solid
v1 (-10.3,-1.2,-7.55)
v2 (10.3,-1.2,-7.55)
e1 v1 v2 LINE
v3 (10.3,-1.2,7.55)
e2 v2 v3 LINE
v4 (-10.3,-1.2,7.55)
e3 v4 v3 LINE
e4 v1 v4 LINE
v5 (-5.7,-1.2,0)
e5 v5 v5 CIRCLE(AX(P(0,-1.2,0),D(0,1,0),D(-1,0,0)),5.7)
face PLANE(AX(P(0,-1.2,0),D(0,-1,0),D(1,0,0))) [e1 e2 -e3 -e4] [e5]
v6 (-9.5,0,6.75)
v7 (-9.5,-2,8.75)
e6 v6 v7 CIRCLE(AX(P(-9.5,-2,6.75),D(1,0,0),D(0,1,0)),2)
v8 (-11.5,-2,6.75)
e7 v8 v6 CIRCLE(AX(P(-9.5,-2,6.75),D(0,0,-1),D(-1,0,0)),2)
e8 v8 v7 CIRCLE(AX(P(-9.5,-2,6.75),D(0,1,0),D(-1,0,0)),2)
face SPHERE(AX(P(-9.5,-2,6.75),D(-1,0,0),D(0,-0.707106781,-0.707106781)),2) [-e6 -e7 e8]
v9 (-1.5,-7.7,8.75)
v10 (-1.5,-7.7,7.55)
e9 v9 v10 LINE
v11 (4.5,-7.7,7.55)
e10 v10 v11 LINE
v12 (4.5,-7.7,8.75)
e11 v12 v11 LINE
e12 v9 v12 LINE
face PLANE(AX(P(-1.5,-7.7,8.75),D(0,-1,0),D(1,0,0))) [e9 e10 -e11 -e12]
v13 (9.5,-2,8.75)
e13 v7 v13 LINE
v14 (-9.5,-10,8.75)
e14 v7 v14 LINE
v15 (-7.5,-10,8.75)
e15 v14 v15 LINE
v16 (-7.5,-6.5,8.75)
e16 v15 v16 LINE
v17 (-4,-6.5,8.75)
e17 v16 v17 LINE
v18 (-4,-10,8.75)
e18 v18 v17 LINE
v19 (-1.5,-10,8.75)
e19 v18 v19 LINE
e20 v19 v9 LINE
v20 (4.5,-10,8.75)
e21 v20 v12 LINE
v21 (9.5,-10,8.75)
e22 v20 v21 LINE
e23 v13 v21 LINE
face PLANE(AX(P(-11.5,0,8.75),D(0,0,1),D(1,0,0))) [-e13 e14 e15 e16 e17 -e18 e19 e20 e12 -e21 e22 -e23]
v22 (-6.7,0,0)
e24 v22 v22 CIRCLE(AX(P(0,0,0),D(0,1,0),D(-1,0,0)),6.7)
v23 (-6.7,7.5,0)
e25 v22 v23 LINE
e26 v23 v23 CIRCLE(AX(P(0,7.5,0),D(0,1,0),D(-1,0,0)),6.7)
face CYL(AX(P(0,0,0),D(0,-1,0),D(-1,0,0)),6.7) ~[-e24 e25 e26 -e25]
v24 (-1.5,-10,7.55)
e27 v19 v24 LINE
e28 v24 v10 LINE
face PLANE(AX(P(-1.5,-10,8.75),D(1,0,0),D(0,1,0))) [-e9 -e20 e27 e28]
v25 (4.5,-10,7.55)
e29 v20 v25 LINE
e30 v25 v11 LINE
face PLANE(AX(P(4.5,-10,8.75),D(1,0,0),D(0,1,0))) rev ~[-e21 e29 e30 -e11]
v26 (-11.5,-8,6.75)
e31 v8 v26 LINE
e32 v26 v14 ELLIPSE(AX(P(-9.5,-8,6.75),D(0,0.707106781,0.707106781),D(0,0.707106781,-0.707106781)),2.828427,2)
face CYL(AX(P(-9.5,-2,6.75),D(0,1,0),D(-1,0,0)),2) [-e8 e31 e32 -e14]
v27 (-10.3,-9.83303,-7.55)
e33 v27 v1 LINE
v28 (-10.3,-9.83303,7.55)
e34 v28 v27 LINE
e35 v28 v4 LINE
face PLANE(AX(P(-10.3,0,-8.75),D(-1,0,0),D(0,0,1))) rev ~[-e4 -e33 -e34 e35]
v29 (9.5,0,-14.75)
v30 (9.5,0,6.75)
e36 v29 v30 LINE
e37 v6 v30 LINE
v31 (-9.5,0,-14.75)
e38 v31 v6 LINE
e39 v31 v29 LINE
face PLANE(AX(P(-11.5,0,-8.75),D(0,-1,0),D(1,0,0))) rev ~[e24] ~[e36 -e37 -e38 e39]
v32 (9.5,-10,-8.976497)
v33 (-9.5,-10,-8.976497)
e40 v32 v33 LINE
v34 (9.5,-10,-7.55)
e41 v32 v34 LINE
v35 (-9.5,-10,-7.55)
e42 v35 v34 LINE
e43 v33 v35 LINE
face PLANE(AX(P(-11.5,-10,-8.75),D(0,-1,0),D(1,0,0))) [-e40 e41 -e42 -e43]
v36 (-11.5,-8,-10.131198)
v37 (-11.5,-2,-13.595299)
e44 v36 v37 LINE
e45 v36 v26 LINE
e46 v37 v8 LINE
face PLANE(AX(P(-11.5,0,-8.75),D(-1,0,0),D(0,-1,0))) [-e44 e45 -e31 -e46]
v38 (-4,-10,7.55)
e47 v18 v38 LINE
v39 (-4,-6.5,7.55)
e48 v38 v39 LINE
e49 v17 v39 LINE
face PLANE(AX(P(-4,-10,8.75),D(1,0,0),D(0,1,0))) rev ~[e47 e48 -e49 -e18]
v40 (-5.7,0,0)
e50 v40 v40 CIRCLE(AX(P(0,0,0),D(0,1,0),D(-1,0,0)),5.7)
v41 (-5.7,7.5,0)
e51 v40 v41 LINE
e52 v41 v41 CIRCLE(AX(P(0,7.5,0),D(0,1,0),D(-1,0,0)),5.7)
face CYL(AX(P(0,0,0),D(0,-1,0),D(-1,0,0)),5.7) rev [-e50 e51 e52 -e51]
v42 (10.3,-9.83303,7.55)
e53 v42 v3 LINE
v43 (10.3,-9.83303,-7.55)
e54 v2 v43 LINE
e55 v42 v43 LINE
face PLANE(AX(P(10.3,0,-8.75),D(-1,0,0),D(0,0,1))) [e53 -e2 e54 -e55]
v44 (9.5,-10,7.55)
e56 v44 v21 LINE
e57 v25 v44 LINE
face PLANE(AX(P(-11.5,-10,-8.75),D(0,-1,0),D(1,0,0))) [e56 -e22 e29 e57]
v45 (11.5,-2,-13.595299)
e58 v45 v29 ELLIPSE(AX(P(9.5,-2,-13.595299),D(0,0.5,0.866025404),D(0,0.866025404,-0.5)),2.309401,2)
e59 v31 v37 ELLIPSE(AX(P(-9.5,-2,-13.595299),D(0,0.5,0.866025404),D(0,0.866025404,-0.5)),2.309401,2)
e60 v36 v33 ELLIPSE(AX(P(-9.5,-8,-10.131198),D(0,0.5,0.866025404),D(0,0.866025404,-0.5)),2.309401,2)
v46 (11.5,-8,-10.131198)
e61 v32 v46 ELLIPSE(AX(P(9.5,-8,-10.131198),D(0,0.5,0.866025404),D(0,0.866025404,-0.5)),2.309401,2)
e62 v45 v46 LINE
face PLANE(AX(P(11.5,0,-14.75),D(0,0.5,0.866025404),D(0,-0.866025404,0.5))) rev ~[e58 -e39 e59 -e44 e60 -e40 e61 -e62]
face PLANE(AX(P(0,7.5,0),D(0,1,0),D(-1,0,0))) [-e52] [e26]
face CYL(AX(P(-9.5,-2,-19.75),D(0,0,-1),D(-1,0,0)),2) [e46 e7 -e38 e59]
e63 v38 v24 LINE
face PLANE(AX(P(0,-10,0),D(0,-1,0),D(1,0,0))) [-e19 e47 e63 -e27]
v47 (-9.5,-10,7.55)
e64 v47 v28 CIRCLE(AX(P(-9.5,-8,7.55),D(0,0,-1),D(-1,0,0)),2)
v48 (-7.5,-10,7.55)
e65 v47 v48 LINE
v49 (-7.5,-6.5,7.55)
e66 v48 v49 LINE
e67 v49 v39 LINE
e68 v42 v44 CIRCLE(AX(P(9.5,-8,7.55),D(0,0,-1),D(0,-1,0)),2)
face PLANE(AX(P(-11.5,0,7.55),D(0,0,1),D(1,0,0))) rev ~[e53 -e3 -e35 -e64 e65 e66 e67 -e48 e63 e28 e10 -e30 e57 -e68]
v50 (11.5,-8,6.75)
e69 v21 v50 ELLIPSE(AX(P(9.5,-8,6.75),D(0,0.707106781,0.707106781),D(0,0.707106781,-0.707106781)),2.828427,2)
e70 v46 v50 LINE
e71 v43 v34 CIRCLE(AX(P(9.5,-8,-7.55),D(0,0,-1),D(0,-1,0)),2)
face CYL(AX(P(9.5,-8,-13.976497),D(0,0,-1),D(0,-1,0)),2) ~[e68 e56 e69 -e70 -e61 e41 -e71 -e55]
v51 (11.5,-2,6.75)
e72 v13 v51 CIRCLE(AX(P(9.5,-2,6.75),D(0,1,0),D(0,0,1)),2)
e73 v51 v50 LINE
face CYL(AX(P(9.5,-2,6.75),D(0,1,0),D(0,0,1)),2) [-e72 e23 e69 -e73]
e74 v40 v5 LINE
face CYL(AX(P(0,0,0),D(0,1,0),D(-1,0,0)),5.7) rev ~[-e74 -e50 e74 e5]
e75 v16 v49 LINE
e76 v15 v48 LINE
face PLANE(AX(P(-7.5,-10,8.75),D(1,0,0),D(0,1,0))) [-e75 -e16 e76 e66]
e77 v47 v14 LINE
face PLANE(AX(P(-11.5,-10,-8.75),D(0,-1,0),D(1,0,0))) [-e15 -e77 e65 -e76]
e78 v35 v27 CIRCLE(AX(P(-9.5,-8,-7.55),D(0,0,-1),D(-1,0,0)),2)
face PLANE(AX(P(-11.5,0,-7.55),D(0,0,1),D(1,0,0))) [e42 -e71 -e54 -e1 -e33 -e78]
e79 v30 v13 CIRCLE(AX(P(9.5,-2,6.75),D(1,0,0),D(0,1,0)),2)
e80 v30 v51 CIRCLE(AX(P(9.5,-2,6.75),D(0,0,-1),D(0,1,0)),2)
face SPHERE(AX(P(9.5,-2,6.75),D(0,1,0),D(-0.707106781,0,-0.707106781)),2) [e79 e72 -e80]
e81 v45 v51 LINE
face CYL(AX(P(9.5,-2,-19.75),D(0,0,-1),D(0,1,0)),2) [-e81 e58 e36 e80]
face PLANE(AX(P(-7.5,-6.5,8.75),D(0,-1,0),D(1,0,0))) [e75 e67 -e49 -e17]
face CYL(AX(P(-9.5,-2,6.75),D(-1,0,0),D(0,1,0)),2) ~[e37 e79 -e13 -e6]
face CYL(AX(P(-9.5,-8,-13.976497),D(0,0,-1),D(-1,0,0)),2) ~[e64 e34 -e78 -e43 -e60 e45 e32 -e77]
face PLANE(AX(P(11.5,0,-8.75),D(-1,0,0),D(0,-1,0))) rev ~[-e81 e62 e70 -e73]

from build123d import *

# Parameters (mm, degrees)
F0_W          = 23
F0_H          = 17.5
F1_DEPTH      = 10
F2_T          = -1.2
F3_R          = 5.7
F4_DEPTH      = 3
F3_R_2        = 6.7
F5_DEPTH      = 7.5
F6_W          = 6
F6_H          = 2.3
F6_W_2        = 3.5
F6_H_2        = 3.5
F7_DEPTH      = 4
F8_DEPTH      = 6
F10_DEPTH     = 30
F11_T1_DEPTH  = 19
F11_T3_DEPTH  = 26.5
F11_T5_DEPTH  = 13
F11_T7_DEPTH  = 27.7264973081
F11_S11_W     = 2
F11_S11_H     = 2
F11_T12_DEPTH = 2
F11_S17_W     = 2
F11_S17_H     = 2
F11_T18_DEPTH = 2


# Not quite as in the source:
# - a fillet or chamfer that OpenCascade refuses, or shapes differently, is made with other operations: its cross-section is extruded or revolved along the edge and cut away or added


with BuildPart() as f1:
    # F0 (on Front) → F1 (new body)
    with BuildSketch(Plane.XZ):
        Rectangle(F0_W, F0_H)
    extrude(amount=F1_DEPTH)

    # F2
    f2_openings = [f1.faces().sort_by_distance(p)[0] for p in [
        (0, -10, 0),
    ]]
    offset(amount=F2_T, openings=f2_openings)

    # F3 (on face) → F4 (cut)
    with BuildSketch(Plane(origin=(0, 0, 0), x_dir=(-1, 0, 0), z_dir=(0, 1, 0))):
        Circle(F3_R)
    extrude(amount=-F4_DEPTH, mode=Mode.SUBTRACT)

    # F3 (on face) → F5 (join)
    with BuildSketch(Plane(origin=(0, 0, 0), x_dir=(-1, 0, 0), z_dir=(0, 1, 0))):
        Circle(F3_R_2)
        Circle(F3_R, mode=Mode.SUBTRACT)
    extrude(amount=F5_DEPTH)

    # F6 (on face) → F7 (cut)
    with BuildSketch(Plane.XY.offset(8.75)):
        with Locations((1.5, -8.85)):
            Rectangle(F6_W, F6_H)
        with Locations((-5.75, -8.25)):
            Rectangle(F6_W_2, F6_H_2)
    extrude(amount=-F7_DEPTH, mode=Mode.SUBTRACT)

    # F8 (add): a face of the model
    f8_faces = [f1.faces().sort_by_distance(p)[0] for p in [
        (0, -5, -8.75),
    ]]
    extrude(f8_faces, amount=F8_DEPTH)

    # F9 (on face) → F10 (cut)
    with BuildSketch(Plane.YZ.offset(11.5)):
        Polygon((-10, -14.75), (0, -14.75), (-10, -8.9764973081), align=None)
    extrude(amount=-F10_DEPTH, mode=Mode.SUBTRACT)

    # F11: fillet of radius 2 on 7 edges, made by hand

    # F11_s2 → F11_t1 (cut)
    with BuildSketch(Plane.YZ.offset(-9.5)):
        with BuildLine():
            ThreePointArc((0, 6.75), (-0.5857864376, 8.1642135624), (-2, 8.75))
            Line((-2, 8.75), (0, 8.75))
            Line((0, 8.75), (0, 6.75))
        make_face()
    extrude(amount=F11_T1_DEPTH, mode=Mode.SUBTRACT)

    # F11_s4 → F11_t3 (cut)
    with BuildSketch(Plane.XY.offset(-19.75)):
        with BuildLine():
            ThreePointArc((-11.5, -2), (-10.9142135624, -0.5857864376), (-9.5, 0))
            Line((-9.5, 0), (-11.5, 0))
            Line((-11.5, 0), (-11.5, -2))
        make_face()
        with BuildLine():
            ThreePointArc((9.5, 0), (10.9142135624, -0.5857864376), (11.5, -2))
            Line((11.5, -2), (11.5, 0))
            Line((11.5, 0), (9.5, 0))
        make_face()
    extrude(amount=F11_T3_DEPTH, mode=Mode.SUBTRACT)

    # F11_s6 → F11_t5 (cut)
    with BuildSketch(Plane.XZ.offset(2)):
        with BuildLine():
            ThreePointArc((9.5, 8.75), (10.9142135624, 8.1642135624), (11.5, 6.75))
            Line((11.5, 6.75), (11.5, 8.75))
            Line((11.5, 8.75), (9.5, 8.75))
        make_face()
        with BuildLine():
            ThreePointArc((-11.5, 6.75), (-10.9142135624, 8.1642135624), (-9.5, 8.75))
            Line((-9.5, 8.75), (-11.5, 8.75))
            Line((-11.5, 8.75), (-11.5, 6.75))
        make_face()
    extrude(amount=F11_T5_DEPTH, mode=Mode.SUBTRACT)

    # F11_s8 → F11_t7 (cut)
    with BuildSketch(Plane.XY.offset(-13.9764973081)):
        with BuildLine():
            ThreePointArc((-11.5, -8), (-10.9142135624, -9.4142135624), (-9.5, -10))
            Line((-9.5, -10), (-11.5, -10))
            Line((-11.5, -10), (-11.5, -8))
        make_face()
        with BuildLine():
            ThreePointArc((9.5, -10), (10.9142135624, -9.4142135624), (11.5, -8))
            Line((11.5, -8), (11.5, -10))
            Line((11.5, -10), (9.5, -10))
        make_face()
    extrude(amount=F11_T7_DEPTH, mode=Mode.SUBTRACT)


with BuildPart() as f11_tool10:
    # F11_s11 → F11_t12 (new body)
    with BuildSketch(Plane.XZ.offset(2)):
        with Locations((10.5, 7.75)):
            Rectangle(F11_S11_W, F11_S11_H)
    extrude(amount=-F11_T12_DEPTH)

    # F11_s13 → F11_t14 (revolve, cut)
    with BuildSketch(Plane(origin=(9.5, -2, 6.75), x_dir=(-0.7071067812, 0, -0.7071067812), z_dir=(0.7071067812, 0, -0.7071067812))):
        with BuildLine():
            ThreePointArc((0, -2), (2, 0), (0, 2))
            Line((0, 2), (0, -2))
        make_face()
    revolve(axis=Axis((9.5, -2, 6.75), (0, 1, 0)), mode=Mode.SUBTRACT)


with BuildPart() as f1_1:
    add(f1.part)

    # F11_t9: cut F11_tool10
    add(f11_tool10.part, mode=Mode.SUBTRACT)


with BuildPart() as f11_tool16:
    # F11_s17 → F11_t18 (new body)
    with BuildSketch(Plane.YZ.offset(-9.5)):
        with Locations((-1, 7.75)):
            Rectangle(F11_S17_W, F11_S17_H)
    extrude(amount=-F11_T18_DEPTH)

    # F11_s19 → F11_t20 (revolve, cut)
    with BuildSketch(Plane(origin=(-9.5, -2, 6.75), x_dir=(0, -0.7071067812, -0.7071067812), z_dir=(0, 0.7071067812, -0.7071067812))):
        with BuildLine():
            ThreePointArc((0, -2), (2, 0), (0, 2))
            Line((0, 2), (0, -2))
        make_face()
    revolve(axis=Axis((-9.5, -2, 6.75), (-1, 0, 0)), mode=Mode.SUBTRACT)


with BuildPart() as f1_2:
    add(f1_1.part)

    # F11_t15: cut F11_tool16
    add(f11_tool16.part, mode=Mode.SUBTRACT)


solid = f1_2.part
